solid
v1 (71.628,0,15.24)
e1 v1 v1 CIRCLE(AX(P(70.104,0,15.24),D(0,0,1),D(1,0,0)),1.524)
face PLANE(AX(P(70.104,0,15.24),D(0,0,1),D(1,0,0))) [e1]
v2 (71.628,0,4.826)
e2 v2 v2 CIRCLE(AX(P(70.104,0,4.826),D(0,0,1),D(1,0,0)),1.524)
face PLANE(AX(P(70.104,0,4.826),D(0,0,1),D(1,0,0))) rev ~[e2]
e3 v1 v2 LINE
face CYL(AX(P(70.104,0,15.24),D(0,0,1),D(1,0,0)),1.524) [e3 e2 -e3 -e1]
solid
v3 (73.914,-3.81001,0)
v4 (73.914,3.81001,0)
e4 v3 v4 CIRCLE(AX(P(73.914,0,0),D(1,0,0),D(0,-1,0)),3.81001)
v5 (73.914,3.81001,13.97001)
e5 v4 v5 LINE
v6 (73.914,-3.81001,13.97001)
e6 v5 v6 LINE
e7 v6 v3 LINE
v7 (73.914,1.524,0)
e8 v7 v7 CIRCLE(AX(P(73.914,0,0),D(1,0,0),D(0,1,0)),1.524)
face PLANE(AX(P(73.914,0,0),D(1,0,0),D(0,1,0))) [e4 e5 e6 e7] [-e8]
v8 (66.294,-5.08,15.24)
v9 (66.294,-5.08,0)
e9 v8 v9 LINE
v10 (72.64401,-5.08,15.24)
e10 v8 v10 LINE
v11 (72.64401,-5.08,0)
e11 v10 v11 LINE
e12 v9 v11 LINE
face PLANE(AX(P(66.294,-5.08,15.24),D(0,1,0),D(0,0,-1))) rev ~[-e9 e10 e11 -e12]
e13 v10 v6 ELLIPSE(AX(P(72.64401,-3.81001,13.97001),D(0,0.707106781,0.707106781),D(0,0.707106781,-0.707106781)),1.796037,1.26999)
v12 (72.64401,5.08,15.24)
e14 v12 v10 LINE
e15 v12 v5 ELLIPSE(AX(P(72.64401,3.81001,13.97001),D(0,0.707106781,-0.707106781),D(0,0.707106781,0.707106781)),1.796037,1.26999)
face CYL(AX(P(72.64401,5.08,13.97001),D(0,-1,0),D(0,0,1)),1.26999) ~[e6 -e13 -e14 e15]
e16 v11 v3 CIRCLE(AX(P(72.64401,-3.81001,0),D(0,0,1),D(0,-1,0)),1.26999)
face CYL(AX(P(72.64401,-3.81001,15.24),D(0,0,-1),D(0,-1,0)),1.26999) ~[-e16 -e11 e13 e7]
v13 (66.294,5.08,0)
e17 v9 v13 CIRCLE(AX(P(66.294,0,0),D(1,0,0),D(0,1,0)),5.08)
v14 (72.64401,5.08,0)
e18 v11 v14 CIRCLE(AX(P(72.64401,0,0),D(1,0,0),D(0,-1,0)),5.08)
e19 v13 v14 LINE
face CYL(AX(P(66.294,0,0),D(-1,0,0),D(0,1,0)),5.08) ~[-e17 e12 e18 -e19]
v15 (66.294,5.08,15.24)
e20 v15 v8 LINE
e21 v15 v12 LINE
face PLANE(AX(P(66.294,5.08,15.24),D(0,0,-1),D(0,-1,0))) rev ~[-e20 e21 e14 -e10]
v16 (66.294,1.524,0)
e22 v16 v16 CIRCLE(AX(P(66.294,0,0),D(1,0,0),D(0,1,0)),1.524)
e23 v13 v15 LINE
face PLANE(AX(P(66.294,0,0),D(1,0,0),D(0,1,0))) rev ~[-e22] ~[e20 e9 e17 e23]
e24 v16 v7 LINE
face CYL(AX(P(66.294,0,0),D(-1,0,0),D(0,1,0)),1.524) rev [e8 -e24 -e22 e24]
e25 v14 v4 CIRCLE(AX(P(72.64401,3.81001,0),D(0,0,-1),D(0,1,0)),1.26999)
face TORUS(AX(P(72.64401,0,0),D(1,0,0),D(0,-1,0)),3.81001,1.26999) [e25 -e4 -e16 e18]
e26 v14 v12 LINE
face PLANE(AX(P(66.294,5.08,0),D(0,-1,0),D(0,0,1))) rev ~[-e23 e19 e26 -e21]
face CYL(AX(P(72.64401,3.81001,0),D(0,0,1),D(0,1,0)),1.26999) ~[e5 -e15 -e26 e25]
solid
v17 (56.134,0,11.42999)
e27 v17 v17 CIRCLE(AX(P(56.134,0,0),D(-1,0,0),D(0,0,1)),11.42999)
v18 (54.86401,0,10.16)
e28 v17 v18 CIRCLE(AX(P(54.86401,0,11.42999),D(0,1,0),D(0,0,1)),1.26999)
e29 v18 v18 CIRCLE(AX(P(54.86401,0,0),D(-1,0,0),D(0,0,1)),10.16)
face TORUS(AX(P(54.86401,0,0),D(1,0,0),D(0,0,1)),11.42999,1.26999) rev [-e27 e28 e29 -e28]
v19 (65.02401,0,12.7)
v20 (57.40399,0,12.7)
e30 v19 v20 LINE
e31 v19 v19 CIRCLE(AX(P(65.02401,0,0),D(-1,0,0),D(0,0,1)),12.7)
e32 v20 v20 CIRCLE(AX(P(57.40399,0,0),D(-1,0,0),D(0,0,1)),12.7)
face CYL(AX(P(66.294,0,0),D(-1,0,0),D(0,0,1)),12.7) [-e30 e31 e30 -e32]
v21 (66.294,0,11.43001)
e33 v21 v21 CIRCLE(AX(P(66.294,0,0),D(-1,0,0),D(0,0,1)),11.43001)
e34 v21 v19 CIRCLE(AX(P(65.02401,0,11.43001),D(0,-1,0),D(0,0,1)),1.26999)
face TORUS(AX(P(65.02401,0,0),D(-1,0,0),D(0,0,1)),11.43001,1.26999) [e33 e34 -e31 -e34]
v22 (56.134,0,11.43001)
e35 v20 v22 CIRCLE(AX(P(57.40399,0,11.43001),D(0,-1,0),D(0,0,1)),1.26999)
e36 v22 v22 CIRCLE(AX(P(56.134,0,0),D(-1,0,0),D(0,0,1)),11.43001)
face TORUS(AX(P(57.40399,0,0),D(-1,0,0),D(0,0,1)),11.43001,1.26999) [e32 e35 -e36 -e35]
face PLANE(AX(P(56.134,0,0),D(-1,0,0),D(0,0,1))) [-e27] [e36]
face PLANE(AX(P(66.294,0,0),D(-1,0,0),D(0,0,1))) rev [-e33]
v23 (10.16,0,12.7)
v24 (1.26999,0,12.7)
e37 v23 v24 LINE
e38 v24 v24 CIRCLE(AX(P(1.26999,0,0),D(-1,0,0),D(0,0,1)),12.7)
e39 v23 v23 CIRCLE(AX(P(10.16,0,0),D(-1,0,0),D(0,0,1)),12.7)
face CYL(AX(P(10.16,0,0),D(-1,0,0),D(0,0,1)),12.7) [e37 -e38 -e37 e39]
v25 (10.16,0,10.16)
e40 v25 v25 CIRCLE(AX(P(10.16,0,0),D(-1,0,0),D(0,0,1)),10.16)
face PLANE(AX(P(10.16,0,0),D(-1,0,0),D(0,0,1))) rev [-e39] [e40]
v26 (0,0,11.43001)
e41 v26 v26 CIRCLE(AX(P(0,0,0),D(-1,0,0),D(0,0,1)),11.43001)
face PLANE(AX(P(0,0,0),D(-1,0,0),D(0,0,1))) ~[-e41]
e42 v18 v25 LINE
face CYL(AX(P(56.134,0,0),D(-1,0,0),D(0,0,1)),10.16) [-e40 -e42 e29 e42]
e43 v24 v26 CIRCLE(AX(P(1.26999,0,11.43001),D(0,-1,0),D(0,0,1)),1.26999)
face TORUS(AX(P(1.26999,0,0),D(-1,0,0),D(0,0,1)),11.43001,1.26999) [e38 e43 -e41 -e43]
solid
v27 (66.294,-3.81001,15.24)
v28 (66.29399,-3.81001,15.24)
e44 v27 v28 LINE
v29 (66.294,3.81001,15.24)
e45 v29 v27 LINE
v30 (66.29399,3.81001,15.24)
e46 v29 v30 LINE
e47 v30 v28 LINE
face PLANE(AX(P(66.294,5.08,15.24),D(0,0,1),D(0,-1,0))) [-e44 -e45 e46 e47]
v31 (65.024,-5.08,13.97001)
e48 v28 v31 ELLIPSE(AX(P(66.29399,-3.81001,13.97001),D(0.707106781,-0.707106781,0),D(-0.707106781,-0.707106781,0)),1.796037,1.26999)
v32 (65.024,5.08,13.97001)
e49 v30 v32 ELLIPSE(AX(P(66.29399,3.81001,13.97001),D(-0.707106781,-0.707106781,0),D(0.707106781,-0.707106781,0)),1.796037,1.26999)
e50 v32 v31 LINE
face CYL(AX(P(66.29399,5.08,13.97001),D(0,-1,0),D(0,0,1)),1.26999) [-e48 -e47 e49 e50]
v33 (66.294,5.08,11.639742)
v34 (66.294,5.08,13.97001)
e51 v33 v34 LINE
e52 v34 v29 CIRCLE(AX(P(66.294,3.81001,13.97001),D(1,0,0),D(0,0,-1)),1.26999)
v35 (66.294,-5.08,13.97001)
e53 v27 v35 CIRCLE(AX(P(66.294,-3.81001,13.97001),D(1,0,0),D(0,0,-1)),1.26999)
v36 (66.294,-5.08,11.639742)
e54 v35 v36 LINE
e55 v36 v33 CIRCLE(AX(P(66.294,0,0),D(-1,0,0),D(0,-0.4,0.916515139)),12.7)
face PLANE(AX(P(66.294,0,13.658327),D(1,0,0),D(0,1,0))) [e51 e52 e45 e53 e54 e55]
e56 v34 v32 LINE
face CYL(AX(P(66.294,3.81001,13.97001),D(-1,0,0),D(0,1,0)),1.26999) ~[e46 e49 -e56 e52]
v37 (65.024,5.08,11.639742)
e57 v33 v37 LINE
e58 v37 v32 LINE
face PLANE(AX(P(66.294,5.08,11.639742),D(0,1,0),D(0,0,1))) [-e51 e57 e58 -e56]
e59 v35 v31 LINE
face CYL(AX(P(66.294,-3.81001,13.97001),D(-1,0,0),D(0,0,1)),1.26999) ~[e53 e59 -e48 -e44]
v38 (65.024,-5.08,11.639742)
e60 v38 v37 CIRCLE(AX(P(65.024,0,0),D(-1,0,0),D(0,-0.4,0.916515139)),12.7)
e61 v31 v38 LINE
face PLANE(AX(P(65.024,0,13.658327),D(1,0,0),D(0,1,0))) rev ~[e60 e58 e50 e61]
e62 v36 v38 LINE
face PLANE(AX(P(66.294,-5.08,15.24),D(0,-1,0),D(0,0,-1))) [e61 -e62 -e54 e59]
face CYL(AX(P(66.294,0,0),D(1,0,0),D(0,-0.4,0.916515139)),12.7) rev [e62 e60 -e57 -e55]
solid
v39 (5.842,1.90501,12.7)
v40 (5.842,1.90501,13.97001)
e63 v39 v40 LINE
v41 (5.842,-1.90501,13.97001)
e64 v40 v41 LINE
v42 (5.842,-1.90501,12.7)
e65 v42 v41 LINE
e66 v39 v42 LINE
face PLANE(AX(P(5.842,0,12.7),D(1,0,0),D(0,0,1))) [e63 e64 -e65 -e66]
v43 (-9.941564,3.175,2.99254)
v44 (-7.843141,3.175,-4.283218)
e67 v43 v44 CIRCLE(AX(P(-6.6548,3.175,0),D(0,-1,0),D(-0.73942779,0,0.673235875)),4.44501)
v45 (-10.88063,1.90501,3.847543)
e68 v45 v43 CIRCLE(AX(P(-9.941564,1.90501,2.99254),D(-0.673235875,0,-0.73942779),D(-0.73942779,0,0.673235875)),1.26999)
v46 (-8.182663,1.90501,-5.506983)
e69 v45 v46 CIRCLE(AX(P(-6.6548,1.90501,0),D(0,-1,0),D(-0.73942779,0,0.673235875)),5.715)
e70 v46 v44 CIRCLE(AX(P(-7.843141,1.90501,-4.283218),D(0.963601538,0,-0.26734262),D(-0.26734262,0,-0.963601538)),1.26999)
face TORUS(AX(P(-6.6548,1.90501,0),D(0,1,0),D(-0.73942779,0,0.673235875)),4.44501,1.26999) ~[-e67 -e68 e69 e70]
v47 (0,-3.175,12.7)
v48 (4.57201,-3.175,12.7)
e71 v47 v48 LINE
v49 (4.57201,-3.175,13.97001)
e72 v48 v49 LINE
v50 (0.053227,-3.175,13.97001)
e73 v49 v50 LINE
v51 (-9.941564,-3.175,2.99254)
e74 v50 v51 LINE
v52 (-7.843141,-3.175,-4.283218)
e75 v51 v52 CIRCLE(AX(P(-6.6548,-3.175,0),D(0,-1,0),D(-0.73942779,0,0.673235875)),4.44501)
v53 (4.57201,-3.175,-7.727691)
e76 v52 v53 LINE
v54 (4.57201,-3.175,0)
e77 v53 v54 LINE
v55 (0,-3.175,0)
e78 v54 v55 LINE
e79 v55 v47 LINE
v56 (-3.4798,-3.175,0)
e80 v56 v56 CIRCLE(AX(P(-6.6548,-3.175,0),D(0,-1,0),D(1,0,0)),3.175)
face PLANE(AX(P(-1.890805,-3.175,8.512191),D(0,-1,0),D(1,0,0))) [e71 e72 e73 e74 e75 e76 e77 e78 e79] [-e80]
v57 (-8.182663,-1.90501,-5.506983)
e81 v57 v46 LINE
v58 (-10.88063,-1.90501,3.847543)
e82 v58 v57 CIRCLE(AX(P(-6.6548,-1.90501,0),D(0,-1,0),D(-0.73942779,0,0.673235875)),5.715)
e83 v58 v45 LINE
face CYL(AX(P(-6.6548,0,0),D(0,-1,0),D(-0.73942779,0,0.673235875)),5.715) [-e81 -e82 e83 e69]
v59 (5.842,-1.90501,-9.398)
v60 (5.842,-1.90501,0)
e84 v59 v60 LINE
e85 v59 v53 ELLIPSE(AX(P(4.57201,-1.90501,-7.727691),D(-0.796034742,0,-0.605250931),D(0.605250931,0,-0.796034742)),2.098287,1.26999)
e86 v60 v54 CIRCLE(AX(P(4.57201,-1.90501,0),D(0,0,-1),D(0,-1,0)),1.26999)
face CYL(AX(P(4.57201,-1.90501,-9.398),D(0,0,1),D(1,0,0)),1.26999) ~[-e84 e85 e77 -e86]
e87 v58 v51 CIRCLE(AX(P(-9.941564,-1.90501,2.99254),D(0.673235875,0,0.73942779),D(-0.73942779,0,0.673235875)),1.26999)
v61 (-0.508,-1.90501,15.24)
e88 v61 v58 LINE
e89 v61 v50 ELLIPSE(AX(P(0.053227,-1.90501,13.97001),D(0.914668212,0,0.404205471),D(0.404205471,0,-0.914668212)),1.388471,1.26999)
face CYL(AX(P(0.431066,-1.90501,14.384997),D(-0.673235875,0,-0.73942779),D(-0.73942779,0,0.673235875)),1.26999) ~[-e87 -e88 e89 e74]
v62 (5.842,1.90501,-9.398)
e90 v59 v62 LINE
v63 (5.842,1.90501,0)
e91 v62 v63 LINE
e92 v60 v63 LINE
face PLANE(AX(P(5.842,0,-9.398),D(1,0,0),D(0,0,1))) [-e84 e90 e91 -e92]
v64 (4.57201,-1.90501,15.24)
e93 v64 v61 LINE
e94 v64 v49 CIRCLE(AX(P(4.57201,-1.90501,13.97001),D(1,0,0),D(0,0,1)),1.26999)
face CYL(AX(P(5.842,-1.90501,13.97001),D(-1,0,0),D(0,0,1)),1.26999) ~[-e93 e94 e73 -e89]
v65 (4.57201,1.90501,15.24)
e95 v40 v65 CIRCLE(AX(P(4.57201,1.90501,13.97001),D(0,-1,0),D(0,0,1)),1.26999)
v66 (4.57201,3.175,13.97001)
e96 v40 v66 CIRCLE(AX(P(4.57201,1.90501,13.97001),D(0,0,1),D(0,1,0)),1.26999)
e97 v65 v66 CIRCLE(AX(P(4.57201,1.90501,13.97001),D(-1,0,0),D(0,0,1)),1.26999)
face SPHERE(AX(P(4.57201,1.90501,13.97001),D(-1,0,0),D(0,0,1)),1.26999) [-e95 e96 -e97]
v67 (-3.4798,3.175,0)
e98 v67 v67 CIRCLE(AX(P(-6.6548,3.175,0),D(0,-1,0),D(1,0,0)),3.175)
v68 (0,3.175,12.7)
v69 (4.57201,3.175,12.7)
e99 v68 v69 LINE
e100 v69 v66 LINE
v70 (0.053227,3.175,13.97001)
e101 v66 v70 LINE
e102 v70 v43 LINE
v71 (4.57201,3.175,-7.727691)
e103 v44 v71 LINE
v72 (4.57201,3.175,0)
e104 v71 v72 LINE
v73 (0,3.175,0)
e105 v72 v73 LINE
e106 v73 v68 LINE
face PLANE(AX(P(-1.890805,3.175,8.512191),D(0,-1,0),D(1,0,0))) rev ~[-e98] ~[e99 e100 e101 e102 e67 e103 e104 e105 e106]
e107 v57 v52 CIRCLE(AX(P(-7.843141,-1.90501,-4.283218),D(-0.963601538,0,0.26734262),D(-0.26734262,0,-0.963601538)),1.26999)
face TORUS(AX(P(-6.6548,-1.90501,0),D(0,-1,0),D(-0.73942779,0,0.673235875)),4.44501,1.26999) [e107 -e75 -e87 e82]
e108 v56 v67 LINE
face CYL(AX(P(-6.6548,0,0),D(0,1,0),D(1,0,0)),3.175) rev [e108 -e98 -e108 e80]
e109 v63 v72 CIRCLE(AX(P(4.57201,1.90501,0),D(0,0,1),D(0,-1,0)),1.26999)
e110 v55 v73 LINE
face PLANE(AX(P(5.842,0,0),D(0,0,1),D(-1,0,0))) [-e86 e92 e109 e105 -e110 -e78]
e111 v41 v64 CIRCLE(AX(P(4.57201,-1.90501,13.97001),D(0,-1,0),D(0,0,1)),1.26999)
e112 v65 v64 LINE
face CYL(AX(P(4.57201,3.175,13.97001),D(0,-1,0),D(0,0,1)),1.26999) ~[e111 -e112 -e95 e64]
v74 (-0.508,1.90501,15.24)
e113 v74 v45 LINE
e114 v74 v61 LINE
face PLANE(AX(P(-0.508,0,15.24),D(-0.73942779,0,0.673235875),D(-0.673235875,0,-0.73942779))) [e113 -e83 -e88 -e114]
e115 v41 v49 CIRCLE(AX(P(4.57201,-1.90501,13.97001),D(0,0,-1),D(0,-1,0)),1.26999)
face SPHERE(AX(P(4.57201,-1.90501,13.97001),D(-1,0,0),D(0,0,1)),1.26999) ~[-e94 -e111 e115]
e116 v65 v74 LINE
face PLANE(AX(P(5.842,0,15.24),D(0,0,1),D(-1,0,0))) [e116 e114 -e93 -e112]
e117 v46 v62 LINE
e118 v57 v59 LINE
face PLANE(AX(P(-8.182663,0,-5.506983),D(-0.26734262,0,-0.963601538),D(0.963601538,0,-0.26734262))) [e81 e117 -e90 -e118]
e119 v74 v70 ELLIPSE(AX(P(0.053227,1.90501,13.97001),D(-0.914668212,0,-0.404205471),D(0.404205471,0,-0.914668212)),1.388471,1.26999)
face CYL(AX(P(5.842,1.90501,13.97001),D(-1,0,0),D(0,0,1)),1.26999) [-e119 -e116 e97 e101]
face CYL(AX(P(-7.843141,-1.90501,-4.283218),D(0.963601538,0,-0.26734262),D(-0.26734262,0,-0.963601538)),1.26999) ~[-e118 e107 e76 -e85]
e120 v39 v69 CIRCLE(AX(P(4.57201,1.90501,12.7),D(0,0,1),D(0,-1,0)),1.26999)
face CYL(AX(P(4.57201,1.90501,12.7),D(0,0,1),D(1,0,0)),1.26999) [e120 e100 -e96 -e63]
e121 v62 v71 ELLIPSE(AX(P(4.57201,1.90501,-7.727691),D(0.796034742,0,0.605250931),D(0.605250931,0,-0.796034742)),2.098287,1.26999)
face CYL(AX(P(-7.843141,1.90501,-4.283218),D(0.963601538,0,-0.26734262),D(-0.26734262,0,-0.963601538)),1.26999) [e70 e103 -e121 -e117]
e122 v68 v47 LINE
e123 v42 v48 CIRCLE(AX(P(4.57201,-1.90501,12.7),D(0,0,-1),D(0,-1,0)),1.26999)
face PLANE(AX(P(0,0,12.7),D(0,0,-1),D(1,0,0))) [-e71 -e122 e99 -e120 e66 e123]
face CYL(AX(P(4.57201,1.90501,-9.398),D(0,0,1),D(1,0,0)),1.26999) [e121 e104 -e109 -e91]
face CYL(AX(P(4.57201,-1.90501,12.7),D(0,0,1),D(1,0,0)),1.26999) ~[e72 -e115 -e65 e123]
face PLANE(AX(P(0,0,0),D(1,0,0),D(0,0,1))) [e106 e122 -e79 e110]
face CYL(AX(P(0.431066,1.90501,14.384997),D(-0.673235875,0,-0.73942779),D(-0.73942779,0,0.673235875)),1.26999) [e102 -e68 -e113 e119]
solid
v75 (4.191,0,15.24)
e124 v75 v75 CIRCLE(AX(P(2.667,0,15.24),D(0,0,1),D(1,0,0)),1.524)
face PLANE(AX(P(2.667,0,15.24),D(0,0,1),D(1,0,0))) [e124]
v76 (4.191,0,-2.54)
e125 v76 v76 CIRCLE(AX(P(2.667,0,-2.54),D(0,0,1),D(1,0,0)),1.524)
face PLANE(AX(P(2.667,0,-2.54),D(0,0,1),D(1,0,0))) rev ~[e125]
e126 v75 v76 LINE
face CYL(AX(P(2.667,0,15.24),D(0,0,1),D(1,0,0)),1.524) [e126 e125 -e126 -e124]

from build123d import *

# Parameters (mm, degrees)
F0_W     = 5.842
F0_H     = 12.7
F0_R     = 3.175
F2_DEPTH = 3.175
F3_R     = 1.524
F4_DEPTH = 7.62
F5_DEPTH = 1.27
F6_R     = 1.524
F7_DEPTH = 10.414
F8_R     = 1.524
F9_DEPTH = 17.78
F10_R    = 1.26999
F10_2_R  = 1.26999
F10_3_R  = 1.26999
F10_4_R  = 1.26999


# Not quite as in the source:
# - a fillet or chamfer is up to 0.001 mm smaller than in the source, because OpenCascade refuses the exact size


with BuildPart() as f1:
    # F0 (on Front) → F1 (revolve)
    with BuildSketch(Plane.XZ):
        Polygon((5.842, 12.7), (5.842, 0), (66.294, 0), (66.294, 12.7), (56.134, 12.7), (56.134, 10.16), (10.16, 10.16), (10.16, 12.7), align=None)
        with Locations((2.921, 6.35)):
            Rectangle(F0_W, F0_H)
    revolve(axis=Axis((33.147, 0, 0), (-1, 0, 0)))

    # F10 (radius 1.27 in the source; OpenCascade refuses exactly that, so slightly less here)
    f10_edges = [f1.edges().sort_by_distance(p)[0] for p in [
        (66.294, 0, -12.7),
        (0, 0, -12.7),
        (56.134, 0, -12.7),
        (56.134, 0, -10.16),
    ]]
    fillet(f10_edges, radius=F10_R)


with BuildPart() as f2:
    # F0 (on Front) → F2 (new body, symmetric)
    with BuildSketch(Plane.XZ):
        with BuildLine():
            Line((-0.9398, 0), (0, 0))
            Line((0, 0), (0, 12.7))
            Line((0, 12.7), (5.842, 12.7))
            Line((5.842, 12.7), (5.842, 15.24))
            Line((5.842, 15.24), (-0.508, 15.24))
            Line((-0.508, 15.24), (-10.8806298187, 3.8475430269))
            ThreePointArc((-10.8806298187, 3.8475430269), (-4.5919612295, 5.3297205562), (-0.9398, 0))
        make_face()
        with BuildLine():
            Line((5.842, 0), (0, 0))
            Line((0, 0), (-0.9398, 0))
            ThreePointArc((-0.9398, 0), (-3.1957909266, -4.5493385486), (-8.1826630726, -5.5069827884))
            Line((-8.1826630726, -5.5069827884), (5.842, -9.398))
            Line((5.842, -9.398), (5.842, 0))
        make_face()
        with BuildLine():
            ThreePointArc((-8.1826630726, -5.5069827884), (-3.1957909266, -4.5493385486), (-0.9398, 0))
            ThreePointArc((-0.9398, 0), (-4.5919612295, 5.3297205562), (-10.8806298187, 3.8475430269))
            ThreePointArc((-10.8806298187, 3.8475430269), (-12.1459778134, -1.5837270034), (-8.1826630726, -5.5069827884))
        make_face()
        with Locations((-6.6548, 0)):
            Circle(F0_R, mode=Mode.SUBTRACT)
    extrude(amount=F2_DEPTH, both=True)

    # F10#2 (radius 1.27 in the source; OpenCascade refuses exactly that, so slightly less here)
    f10_2_edges = [f2.edges().sort_by_distance(p)[0] for p in [
        (-12.145978, 3.175, -1.583727),
        (-5.694315, 3.175, 9.543772),
        (-5.694315, -3.175, 9.543772),
        (-12.145978, -3.175, -1.583727),
        (2.667, 3.175, 15.24),
        (2.667, -3.175, 15.24),
        (5.842, 0, 15.24),
        (5.842, -3.175, 13.97),
        (5.842, -3.175, -4.699),
        (5.842, 3.175, 13.97),
        (5.842, 3.175, -4.699),
        (-1.170332, 3.175, -7.452491),
        (-1.170332, -3.175, -7.452491),
    ]]
    fillet(f10_2_edges, radius=F10_2_R)


with BuildPart() as f4:
    # F3 (on face) → F4 (new body)
    with BuildSketch(Plane.YZ.offset(66.294)):
        with BuildLine():
            ThreePointArc((-5.08, 0), (0, -5.08), (5.08, 0))
            ThreePointArc((5.08, 0), (0, 5.08), (-5.08, 0))
        make_face()
        Circle(F3_R, mode=Mode.SUBTRACT)
        with BuildLine():
            ThreePointArc((-5.08, 0), (0, 5.08), (5.08, 0))
            Line((5.08, 0), (5.08, 15.24))
            Line((5.08, 15.24), (-5.08, 15.24))
            Line((-5.08, 15.24), (-5.08, 0))
        make_face()
    extrude(amount=F4_DEPTH)

    # F10#3 (radius 1.27 in the source; OpenCascade refuses exactly that, so slightly less here)
    f10_3_edges = [f4.edges().sort_by_distance(p)[0] for p in [
        (73.914, 5.08, 7.62),
        (73.914, 0, 15.24),
        (73.914, 0, -5.08),
        (73.914, -5.08, 7.62),
    ]]
    fillet(f10_3_edges, radius=F10_3_R)


with BuildPart() as f5:
    # F3 (on face) → F5 (new body)
    with BuildSketch(Plane.YZ.offset(66.294)):
        with BuildLine():
            ThreePointArc((-5.08, 11.6397422652), (0, 12.7), (5.08, 11.6397422652))
            Line((5.08, 11.6397422652), (5.08, 15.24))
            Line((5.08, 15.24), (-5.08, 15.24))
            Line((-5.08, 15.24), (-5.08, 11.6397422652))
        make_face()
    extrude(amount=-F5_DEPTH)

    # F10#4 (radius 1.27 in the source; OpenCascade refuses exactly that, so slightly less here)
    f10_4_edges = [f5.edges().sort_by_distance(p)[0] for p in [
        (65.024, 0, 15.24),
        (65.659, -5.08, 15.24),
        (65.659, 5.08, 15.24),
    ]]
    fillet(f10_4_edges, radius=F10_4_R)


with BuildPart() as f7:
    # F6 (on face) → F7 (new body)
    with BuildSketch(Plane.XY.offset(15.24)):
        with Locations((70.104, 0)):
            Circle(F6_R)
    extrude(amount=-F7_DEPTH)


with BuildPart() as f9:
    # F8 (on face) → F9 (new body)
    with BuildSketch(Plane.XY.offset(15.24)):
        with Locations((2.667, 0)):
            Circle(F8_R)
    extrude(amount=-F9_DEPTH)


solid = Compound([f1.part, f2.part, f4.part, f5.part, f7.part, f9.part])
